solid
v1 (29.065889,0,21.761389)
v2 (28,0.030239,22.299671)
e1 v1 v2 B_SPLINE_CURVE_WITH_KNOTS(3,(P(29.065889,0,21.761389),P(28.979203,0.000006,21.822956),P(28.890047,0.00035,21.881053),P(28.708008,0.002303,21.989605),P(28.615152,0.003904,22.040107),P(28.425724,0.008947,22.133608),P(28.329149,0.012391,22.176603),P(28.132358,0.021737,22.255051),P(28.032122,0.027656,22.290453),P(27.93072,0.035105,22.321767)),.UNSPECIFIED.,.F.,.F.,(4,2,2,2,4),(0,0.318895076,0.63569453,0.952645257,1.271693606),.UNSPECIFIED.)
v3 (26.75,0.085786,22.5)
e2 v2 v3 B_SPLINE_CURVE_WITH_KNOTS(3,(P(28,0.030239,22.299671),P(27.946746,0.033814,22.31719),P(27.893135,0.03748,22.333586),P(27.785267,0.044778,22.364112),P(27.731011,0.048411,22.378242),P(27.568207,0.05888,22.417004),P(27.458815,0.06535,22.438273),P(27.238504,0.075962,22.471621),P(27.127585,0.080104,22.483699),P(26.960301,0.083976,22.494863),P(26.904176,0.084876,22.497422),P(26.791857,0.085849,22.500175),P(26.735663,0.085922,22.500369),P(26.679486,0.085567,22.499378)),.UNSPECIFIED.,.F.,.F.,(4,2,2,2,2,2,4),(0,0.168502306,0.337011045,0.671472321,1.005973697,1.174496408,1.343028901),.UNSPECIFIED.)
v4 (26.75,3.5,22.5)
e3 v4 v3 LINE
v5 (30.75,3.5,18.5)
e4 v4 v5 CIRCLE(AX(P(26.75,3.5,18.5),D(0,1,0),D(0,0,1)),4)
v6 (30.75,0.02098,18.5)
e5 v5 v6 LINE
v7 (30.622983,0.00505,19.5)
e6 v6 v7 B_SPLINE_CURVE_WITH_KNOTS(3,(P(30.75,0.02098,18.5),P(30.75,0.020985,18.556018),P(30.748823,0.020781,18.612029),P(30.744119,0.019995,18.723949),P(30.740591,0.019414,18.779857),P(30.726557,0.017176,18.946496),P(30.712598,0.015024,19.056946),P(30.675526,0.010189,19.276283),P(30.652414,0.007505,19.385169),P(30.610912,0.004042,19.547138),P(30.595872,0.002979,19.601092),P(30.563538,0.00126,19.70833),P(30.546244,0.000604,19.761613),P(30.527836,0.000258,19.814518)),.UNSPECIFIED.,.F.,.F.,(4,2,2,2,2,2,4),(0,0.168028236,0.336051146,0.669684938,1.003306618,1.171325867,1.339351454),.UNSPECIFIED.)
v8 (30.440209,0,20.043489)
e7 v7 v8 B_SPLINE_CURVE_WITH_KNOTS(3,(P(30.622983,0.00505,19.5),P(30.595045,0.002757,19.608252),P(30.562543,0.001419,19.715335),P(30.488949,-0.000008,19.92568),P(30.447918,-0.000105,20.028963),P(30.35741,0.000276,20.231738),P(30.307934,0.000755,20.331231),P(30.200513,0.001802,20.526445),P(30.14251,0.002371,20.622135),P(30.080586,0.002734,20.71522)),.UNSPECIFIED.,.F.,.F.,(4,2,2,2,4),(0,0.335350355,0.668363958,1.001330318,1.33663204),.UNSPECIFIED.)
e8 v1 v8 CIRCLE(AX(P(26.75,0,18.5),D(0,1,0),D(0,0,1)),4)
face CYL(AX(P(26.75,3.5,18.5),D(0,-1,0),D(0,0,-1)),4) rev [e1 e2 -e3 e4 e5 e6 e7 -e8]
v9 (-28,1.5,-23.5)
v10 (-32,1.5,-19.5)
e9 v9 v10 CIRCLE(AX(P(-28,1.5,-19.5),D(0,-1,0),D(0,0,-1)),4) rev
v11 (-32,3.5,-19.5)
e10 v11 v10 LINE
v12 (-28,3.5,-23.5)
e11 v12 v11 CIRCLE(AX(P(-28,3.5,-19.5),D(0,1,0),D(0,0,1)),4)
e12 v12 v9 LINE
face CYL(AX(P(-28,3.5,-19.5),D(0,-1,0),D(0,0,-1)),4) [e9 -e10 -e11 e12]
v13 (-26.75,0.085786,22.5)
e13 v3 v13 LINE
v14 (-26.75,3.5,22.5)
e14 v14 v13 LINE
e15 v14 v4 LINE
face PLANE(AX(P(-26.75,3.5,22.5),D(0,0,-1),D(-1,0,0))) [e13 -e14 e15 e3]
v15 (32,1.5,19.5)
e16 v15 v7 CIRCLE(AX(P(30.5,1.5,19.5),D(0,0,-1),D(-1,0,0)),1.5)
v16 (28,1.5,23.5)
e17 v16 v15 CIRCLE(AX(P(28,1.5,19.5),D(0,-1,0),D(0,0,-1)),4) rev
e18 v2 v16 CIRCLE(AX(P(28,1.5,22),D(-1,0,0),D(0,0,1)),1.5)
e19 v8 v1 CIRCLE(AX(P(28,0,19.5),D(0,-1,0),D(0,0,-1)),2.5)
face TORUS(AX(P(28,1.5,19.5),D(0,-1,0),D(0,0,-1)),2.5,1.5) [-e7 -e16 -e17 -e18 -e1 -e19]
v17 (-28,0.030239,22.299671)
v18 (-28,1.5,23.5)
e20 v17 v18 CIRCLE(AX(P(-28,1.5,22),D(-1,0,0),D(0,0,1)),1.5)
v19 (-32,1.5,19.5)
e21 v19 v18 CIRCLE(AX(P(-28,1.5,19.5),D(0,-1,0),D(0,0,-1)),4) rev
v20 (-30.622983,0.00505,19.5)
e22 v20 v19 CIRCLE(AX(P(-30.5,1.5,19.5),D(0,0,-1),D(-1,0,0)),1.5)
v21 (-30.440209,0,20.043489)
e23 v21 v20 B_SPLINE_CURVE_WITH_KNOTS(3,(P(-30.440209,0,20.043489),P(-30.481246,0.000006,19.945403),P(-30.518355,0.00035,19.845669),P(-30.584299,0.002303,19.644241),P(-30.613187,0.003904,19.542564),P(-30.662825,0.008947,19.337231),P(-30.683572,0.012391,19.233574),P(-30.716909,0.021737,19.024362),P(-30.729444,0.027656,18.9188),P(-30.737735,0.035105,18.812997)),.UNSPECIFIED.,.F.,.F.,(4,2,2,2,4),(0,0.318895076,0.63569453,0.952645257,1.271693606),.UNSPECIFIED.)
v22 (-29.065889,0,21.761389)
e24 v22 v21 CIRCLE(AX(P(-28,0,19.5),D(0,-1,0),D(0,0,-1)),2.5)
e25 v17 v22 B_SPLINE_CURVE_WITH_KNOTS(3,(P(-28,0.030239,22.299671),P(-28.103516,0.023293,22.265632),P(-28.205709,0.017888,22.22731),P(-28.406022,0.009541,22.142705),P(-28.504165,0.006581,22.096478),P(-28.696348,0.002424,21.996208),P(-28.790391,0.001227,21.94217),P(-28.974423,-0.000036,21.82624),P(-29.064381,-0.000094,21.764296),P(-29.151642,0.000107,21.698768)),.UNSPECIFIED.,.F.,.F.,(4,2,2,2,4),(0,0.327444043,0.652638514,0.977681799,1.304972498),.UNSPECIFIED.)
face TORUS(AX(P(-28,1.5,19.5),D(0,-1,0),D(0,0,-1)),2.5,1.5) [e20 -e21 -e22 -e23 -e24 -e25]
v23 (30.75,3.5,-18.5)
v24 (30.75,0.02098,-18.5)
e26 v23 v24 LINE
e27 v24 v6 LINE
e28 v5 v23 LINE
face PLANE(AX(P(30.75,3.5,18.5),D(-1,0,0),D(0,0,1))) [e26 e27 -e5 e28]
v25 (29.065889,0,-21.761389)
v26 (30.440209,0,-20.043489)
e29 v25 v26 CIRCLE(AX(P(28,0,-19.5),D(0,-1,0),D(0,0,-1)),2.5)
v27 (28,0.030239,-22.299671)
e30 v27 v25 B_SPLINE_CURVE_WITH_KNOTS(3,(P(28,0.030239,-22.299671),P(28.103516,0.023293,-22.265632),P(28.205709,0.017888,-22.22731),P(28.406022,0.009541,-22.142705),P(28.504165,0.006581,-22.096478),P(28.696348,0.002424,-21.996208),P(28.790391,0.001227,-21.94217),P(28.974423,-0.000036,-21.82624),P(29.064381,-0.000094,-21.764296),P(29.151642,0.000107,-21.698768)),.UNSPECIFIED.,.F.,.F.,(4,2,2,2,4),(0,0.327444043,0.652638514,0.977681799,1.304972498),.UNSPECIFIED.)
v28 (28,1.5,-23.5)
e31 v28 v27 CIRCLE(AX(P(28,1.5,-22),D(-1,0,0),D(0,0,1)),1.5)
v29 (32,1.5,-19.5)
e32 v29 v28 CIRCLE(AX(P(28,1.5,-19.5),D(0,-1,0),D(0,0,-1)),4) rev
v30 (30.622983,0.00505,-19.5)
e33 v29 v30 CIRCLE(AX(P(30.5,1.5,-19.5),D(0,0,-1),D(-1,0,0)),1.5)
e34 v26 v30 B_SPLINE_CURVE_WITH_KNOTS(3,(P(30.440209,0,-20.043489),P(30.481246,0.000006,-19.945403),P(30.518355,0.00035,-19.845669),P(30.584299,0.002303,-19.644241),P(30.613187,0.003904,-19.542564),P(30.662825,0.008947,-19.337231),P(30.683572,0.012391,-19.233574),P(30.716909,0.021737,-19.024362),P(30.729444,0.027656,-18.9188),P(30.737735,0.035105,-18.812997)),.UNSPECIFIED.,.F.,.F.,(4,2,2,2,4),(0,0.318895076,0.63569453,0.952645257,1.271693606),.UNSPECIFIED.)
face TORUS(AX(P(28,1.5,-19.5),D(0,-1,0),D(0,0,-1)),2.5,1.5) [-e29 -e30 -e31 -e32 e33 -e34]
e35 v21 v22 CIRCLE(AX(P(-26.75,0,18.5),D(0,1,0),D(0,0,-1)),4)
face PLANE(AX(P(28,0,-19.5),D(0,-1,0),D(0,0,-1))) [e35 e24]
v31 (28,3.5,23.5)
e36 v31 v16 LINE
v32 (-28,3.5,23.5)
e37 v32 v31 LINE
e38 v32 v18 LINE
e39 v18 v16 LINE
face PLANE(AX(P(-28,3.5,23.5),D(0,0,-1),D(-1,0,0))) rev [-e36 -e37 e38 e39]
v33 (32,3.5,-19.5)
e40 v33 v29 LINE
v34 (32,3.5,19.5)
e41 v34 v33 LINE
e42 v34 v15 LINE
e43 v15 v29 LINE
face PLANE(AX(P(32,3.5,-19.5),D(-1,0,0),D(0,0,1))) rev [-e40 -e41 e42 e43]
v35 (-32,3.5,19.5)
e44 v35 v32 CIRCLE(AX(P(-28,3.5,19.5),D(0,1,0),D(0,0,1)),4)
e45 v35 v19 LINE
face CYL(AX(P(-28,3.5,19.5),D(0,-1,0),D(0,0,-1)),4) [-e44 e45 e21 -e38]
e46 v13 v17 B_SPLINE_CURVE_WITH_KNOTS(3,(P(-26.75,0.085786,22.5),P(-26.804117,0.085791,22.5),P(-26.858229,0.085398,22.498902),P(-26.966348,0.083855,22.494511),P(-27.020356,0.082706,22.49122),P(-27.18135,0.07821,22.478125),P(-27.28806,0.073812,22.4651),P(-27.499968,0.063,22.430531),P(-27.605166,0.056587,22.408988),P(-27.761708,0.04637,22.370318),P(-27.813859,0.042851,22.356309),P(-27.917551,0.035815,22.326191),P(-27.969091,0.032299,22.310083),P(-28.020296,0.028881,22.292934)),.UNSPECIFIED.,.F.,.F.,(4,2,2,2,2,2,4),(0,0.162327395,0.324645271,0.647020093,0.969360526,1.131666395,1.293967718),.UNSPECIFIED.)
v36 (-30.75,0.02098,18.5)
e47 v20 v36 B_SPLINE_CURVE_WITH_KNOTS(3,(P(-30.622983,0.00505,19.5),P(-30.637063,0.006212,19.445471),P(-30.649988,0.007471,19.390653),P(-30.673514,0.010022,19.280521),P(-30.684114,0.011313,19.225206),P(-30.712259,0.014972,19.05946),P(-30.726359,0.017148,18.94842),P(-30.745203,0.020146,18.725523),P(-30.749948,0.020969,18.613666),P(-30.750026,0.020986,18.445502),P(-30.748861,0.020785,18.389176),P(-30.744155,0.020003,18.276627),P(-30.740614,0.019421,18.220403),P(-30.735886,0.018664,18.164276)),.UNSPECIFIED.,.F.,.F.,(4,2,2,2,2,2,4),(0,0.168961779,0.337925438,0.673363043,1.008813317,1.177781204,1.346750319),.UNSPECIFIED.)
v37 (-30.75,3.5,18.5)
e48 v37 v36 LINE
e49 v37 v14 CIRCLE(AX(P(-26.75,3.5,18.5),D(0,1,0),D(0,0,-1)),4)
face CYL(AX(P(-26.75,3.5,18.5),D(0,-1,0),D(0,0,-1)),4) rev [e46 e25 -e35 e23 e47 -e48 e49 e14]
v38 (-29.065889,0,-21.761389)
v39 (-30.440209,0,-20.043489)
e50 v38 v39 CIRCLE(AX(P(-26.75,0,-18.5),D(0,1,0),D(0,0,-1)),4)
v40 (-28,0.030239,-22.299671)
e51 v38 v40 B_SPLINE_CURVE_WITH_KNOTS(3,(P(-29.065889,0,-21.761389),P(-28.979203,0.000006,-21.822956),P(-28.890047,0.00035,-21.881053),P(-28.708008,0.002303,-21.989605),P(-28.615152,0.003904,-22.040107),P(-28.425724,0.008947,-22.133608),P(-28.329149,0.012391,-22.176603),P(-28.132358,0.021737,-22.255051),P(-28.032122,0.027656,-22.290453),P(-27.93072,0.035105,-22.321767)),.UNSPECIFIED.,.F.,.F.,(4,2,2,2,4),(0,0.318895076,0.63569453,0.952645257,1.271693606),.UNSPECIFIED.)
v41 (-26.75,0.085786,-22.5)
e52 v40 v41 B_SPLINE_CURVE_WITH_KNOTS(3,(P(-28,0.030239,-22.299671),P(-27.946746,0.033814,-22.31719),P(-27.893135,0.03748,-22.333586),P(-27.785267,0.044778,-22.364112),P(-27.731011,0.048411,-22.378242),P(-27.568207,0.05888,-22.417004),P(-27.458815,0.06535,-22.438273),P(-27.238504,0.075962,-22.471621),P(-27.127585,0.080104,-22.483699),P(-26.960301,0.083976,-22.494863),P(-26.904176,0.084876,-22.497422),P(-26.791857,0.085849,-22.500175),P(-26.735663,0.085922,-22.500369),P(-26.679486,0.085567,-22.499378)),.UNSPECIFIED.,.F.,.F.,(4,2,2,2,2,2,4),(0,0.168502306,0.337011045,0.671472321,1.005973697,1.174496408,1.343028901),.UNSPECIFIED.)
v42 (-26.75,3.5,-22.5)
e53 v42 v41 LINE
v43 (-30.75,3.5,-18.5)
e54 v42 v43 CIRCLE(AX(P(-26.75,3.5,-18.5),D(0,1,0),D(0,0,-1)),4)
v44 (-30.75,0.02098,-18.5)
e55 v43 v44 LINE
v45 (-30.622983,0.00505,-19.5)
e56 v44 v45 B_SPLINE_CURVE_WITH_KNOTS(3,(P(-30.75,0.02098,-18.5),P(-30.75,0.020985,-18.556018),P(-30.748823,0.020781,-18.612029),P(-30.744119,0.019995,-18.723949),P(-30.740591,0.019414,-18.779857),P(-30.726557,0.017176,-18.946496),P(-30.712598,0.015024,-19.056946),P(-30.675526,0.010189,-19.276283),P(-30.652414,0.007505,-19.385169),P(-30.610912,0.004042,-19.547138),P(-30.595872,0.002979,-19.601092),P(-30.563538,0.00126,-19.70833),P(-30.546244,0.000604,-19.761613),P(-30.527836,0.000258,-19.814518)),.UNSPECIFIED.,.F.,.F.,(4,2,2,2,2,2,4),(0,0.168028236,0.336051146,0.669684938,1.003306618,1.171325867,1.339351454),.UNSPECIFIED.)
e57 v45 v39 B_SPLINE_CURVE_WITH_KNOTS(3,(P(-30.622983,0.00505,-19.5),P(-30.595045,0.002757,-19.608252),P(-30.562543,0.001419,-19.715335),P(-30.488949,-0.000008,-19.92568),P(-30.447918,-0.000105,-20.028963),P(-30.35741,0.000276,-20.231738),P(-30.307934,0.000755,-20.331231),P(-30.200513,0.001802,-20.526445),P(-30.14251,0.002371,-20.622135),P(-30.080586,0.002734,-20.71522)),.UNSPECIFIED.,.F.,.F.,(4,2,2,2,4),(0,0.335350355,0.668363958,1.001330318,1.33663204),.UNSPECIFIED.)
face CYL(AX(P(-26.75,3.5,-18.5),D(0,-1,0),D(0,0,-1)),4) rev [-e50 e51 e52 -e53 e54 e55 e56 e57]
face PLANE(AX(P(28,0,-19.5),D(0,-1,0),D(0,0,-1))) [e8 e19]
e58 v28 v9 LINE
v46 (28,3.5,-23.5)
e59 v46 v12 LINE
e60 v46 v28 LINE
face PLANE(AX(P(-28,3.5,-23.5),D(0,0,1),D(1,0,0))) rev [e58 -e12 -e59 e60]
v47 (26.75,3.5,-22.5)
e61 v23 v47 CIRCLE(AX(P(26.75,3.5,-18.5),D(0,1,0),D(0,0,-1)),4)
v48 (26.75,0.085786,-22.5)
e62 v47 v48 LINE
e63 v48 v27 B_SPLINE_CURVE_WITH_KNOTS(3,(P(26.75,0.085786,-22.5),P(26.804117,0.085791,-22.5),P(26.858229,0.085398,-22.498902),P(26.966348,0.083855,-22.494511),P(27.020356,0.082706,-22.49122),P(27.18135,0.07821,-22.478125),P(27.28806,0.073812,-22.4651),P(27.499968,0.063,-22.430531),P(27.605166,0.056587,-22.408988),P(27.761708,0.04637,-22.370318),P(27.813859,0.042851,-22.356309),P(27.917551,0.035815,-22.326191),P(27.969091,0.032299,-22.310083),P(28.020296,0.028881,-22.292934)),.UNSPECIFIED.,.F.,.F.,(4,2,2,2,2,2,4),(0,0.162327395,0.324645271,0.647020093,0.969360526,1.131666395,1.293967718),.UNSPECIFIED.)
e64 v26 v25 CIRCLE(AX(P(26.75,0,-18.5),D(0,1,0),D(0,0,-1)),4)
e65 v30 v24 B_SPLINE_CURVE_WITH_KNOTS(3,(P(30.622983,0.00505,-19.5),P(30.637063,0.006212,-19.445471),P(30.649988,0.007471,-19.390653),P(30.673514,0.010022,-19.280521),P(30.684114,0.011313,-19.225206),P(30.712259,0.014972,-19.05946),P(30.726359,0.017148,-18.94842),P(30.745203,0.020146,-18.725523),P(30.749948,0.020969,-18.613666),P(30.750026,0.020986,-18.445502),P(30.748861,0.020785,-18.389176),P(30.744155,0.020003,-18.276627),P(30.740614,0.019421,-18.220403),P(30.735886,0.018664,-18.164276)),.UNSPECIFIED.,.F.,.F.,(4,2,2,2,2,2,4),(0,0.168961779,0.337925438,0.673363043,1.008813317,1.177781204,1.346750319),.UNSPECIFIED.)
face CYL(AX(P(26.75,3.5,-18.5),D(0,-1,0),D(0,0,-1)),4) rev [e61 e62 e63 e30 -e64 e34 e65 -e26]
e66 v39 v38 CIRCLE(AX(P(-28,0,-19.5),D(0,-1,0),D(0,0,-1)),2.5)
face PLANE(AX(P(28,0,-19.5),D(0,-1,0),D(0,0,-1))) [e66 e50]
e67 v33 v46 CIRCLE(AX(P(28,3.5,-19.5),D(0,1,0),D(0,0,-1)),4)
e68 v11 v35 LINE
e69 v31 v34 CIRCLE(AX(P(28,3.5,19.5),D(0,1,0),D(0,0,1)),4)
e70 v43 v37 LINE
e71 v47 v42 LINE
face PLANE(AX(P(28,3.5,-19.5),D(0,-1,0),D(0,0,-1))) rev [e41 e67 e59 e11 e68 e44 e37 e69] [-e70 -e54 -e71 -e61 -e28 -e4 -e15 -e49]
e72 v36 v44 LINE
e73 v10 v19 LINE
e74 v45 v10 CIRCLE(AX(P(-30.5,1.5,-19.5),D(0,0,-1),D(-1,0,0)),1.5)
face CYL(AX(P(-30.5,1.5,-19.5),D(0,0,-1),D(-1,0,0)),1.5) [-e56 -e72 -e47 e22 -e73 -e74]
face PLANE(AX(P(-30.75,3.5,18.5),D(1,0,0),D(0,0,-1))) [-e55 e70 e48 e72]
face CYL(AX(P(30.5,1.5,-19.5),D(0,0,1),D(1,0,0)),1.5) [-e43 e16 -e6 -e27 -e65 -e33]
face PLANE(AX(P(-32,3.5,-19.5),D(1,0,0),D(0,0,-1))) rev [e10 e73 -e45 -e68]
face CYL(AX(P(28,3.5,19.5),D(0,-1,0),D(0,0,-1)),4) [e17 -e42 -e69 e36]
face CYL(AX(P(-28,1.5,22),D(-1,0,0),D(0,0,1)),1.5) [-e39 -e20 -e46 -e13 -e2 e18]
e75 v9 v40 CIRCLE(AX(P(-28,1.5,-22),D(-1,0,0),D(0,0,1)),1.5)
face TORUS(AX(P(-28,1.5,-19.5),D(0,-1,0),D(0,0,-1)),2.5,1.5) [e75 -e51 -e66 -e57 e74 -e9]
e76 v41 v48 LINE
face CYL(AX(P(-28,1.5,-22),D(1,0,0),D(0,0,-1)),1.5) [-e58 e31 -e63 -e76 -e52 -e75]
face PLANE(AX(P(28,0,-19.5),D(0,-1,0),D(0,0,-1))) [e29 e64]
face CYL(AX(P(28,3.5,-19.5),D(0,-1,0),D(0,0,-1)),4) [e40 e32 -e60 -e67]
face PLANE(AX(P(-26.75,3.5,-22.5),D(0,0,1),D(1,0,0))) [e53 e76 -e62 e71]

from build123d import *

# Parameters (mm, degrees)
BOSS_EXTRUDE1_DEPTH = 3.5
FILLET2_R           = 1.5


with BuildPart() as part:
    # Sketch1 → Boss-Extrude1 (new body)
    with BuildSketch(Plane(origin=(0, 0, 0), x_dir=(1, 0, 0), z_dir=(0, 1, 0))):
        with BuildLine():
            Line((-28, 23.5), (28, 23.5))
            ThreePointArc((28, 23.5), (30.828427125, 22.328427125), (32, 19.5))
            Line((32, 19.5), (32, -19.5))
            ThreePointArc((32, -19.5), (30.828427125, -22.328427125), (28, -23.5))
            Line((28, -23.5), (-28, -23.5))
            ThreePointArc((-28, -23.5), (-30.828427125, -22.328427125), (-32, -19.5))
            Line((-32, -19.5), (-32, 19.5))
            ThreePointArc((-32, 19.5), (-30.828427125, 22.328427125), (-28, 23.5))
        make_face()
        with BuildLine():
            Line((-26.75, -22.5), (26.75, -22.5))
            ThreePointArc((26.75, -22.5), (29.578427125, -21.328427125), (30.75, -18.5))
            Line((30.75, -18.5), (30.75, 18.5))
            ThreePointArc((30.75, 18.5), (29.578427125, 21.328427125), (26.75, 22.5))
            Line((26.75, 22.5), (-26.75, 22.5))
            ThreePointArc((-26.75, 22.5), (-29.578427125, 21.328427125), (-30.75, 18.5))
            Line((-30.75, 18.5), (-30.75, -18.5))
            ThreePointArc((-30.75, -18.5), (-29.578427125, -21.328427125), (-26.75, -22.5))
        make_face(mode=Mode.SUBTRACT)
    extrude(amount=BOSS_EXTRUDE1_DEPTH)

    # Fillet2
    # the kernel refuses this fillet: 1.5 mm, written as the material it takes off along each edge
    with BuildSketch(Plane(origin=(-28, 0, -19.5), x_dir=(-1, 0, 0), z_dir=(0, 0, 1))) as fillet2_piece_1:
        with BuildLine():
            CenterArc((4 - FILLET2_R, -FILLET2_R), FILLET2_R, 0, 90)
            Line((4 - FILLET2_R, 0), (4, 0))
            Line((4, 0), (4, -FILLET2_R))
        make_face()
    revolve(axis=Axis((-28, 0, -19.5), (0, -1, 0)), revolution_arc=90, mode=Mode.SUBTRACT)
    with BuildSketch(Plane(origin=(28, 0, -19.5), x_dir=(0, 0, -1), z_dir=(-1, 0, 0))) as fillet2_piece_2:
        with BuildLine():
            CenterArc((4 - FILLET2_R, -FILLET2_R), FILLET2_R, 0, 90)
            Line((4 - FILLET2_R, 0), (4, 0))
            Line((4, 0), (4, -FILLET2_R))
        make_face()
    revolve(axis=Axis((28, 0, -19.5), (0, -1, 0)), revolution_arc=90, mode=Mode.SUBTRACT)
    with BuildSketch(Plane(origin=(28, 0, 19.5), x_dir=(1, 0, 0), z_dir=(0, 0, -1))) as fillet2_piece_3:
        with BuildLine():
            CenterArc((4 - FILLET2_R, -FILLET2_R), FILLET2_R, 0, 90)
            Line((4 - FILLET2_R, 0), (4, 0))
            Line((4, 0), (4, -FILLET2_R))
        make_face()
    revolve(axis=Axis((28, 0, 19.5), (0, -1, 0)), revolution_arc=90, mode=Mode.SUBTRACT)
    with BuildSketch(Plane(origin=(-28, 0, 19.5), x_dir=(0, 0, 1), z_dir=(1, 0, 0))) as fillet2_piece_4:
        with BuildLine():
            CenterArc((4 - FILLET2_R, -FILLET2_R), FILLET2_R, 0, 90)
            Line((4 - FILLET2_R, 0), (4, 0))
            Line((4, 0), (4, -FILLET2_R))
        make_face()
    revolve(axis=Axis((-28, 0, 19.5), (0, -1, 0)), revolution_arc=90, mode=Mode.SUBTRACT)
    with BuildSketch(Plane(origin=(28, 0, 23.5), x_dir=(0, 1, 0), z_dir=(-1, 0, 0)), Plane(origin=(-28, 0, -23.5), x_dir=(0, 1, 0), z_dir=(1, 0, 0))) as fillet2_piece_5:
        with BuildLine():
            CenterArc((FILLET2_R, FILLET2_R), FILLET2_R, 180, 90)
            Line((0, FILLET2_R), (0, 0))
            Line((0, 0), (FILLET2_R, 0))
        make_face()
    extrude(amount=56, mode=Mode.SUBTRACT)
    with BuildSketch(Plane(origin=(-32, 0, 19.5), x_dir=(0, 1, 0), z_dir=(0, 0, -1)), Plane(origin=(32, 0, -19.5), x_dir=(0, 1, 0), z_dir=(0, 0, 1))) as fillet2_piece_6:
        with BuildLine():
            CenterArc((FILLET2_R, FILLET2_R), FILLET2_R, 180, 90)
            Line((0, FILLET2_R), (0, 0))
            Line((0, 0), (FILLET2_R, 0))
        make_face()
    extrude(amount=39, mode=Mode.SUBTRACT)


solid = part.part
